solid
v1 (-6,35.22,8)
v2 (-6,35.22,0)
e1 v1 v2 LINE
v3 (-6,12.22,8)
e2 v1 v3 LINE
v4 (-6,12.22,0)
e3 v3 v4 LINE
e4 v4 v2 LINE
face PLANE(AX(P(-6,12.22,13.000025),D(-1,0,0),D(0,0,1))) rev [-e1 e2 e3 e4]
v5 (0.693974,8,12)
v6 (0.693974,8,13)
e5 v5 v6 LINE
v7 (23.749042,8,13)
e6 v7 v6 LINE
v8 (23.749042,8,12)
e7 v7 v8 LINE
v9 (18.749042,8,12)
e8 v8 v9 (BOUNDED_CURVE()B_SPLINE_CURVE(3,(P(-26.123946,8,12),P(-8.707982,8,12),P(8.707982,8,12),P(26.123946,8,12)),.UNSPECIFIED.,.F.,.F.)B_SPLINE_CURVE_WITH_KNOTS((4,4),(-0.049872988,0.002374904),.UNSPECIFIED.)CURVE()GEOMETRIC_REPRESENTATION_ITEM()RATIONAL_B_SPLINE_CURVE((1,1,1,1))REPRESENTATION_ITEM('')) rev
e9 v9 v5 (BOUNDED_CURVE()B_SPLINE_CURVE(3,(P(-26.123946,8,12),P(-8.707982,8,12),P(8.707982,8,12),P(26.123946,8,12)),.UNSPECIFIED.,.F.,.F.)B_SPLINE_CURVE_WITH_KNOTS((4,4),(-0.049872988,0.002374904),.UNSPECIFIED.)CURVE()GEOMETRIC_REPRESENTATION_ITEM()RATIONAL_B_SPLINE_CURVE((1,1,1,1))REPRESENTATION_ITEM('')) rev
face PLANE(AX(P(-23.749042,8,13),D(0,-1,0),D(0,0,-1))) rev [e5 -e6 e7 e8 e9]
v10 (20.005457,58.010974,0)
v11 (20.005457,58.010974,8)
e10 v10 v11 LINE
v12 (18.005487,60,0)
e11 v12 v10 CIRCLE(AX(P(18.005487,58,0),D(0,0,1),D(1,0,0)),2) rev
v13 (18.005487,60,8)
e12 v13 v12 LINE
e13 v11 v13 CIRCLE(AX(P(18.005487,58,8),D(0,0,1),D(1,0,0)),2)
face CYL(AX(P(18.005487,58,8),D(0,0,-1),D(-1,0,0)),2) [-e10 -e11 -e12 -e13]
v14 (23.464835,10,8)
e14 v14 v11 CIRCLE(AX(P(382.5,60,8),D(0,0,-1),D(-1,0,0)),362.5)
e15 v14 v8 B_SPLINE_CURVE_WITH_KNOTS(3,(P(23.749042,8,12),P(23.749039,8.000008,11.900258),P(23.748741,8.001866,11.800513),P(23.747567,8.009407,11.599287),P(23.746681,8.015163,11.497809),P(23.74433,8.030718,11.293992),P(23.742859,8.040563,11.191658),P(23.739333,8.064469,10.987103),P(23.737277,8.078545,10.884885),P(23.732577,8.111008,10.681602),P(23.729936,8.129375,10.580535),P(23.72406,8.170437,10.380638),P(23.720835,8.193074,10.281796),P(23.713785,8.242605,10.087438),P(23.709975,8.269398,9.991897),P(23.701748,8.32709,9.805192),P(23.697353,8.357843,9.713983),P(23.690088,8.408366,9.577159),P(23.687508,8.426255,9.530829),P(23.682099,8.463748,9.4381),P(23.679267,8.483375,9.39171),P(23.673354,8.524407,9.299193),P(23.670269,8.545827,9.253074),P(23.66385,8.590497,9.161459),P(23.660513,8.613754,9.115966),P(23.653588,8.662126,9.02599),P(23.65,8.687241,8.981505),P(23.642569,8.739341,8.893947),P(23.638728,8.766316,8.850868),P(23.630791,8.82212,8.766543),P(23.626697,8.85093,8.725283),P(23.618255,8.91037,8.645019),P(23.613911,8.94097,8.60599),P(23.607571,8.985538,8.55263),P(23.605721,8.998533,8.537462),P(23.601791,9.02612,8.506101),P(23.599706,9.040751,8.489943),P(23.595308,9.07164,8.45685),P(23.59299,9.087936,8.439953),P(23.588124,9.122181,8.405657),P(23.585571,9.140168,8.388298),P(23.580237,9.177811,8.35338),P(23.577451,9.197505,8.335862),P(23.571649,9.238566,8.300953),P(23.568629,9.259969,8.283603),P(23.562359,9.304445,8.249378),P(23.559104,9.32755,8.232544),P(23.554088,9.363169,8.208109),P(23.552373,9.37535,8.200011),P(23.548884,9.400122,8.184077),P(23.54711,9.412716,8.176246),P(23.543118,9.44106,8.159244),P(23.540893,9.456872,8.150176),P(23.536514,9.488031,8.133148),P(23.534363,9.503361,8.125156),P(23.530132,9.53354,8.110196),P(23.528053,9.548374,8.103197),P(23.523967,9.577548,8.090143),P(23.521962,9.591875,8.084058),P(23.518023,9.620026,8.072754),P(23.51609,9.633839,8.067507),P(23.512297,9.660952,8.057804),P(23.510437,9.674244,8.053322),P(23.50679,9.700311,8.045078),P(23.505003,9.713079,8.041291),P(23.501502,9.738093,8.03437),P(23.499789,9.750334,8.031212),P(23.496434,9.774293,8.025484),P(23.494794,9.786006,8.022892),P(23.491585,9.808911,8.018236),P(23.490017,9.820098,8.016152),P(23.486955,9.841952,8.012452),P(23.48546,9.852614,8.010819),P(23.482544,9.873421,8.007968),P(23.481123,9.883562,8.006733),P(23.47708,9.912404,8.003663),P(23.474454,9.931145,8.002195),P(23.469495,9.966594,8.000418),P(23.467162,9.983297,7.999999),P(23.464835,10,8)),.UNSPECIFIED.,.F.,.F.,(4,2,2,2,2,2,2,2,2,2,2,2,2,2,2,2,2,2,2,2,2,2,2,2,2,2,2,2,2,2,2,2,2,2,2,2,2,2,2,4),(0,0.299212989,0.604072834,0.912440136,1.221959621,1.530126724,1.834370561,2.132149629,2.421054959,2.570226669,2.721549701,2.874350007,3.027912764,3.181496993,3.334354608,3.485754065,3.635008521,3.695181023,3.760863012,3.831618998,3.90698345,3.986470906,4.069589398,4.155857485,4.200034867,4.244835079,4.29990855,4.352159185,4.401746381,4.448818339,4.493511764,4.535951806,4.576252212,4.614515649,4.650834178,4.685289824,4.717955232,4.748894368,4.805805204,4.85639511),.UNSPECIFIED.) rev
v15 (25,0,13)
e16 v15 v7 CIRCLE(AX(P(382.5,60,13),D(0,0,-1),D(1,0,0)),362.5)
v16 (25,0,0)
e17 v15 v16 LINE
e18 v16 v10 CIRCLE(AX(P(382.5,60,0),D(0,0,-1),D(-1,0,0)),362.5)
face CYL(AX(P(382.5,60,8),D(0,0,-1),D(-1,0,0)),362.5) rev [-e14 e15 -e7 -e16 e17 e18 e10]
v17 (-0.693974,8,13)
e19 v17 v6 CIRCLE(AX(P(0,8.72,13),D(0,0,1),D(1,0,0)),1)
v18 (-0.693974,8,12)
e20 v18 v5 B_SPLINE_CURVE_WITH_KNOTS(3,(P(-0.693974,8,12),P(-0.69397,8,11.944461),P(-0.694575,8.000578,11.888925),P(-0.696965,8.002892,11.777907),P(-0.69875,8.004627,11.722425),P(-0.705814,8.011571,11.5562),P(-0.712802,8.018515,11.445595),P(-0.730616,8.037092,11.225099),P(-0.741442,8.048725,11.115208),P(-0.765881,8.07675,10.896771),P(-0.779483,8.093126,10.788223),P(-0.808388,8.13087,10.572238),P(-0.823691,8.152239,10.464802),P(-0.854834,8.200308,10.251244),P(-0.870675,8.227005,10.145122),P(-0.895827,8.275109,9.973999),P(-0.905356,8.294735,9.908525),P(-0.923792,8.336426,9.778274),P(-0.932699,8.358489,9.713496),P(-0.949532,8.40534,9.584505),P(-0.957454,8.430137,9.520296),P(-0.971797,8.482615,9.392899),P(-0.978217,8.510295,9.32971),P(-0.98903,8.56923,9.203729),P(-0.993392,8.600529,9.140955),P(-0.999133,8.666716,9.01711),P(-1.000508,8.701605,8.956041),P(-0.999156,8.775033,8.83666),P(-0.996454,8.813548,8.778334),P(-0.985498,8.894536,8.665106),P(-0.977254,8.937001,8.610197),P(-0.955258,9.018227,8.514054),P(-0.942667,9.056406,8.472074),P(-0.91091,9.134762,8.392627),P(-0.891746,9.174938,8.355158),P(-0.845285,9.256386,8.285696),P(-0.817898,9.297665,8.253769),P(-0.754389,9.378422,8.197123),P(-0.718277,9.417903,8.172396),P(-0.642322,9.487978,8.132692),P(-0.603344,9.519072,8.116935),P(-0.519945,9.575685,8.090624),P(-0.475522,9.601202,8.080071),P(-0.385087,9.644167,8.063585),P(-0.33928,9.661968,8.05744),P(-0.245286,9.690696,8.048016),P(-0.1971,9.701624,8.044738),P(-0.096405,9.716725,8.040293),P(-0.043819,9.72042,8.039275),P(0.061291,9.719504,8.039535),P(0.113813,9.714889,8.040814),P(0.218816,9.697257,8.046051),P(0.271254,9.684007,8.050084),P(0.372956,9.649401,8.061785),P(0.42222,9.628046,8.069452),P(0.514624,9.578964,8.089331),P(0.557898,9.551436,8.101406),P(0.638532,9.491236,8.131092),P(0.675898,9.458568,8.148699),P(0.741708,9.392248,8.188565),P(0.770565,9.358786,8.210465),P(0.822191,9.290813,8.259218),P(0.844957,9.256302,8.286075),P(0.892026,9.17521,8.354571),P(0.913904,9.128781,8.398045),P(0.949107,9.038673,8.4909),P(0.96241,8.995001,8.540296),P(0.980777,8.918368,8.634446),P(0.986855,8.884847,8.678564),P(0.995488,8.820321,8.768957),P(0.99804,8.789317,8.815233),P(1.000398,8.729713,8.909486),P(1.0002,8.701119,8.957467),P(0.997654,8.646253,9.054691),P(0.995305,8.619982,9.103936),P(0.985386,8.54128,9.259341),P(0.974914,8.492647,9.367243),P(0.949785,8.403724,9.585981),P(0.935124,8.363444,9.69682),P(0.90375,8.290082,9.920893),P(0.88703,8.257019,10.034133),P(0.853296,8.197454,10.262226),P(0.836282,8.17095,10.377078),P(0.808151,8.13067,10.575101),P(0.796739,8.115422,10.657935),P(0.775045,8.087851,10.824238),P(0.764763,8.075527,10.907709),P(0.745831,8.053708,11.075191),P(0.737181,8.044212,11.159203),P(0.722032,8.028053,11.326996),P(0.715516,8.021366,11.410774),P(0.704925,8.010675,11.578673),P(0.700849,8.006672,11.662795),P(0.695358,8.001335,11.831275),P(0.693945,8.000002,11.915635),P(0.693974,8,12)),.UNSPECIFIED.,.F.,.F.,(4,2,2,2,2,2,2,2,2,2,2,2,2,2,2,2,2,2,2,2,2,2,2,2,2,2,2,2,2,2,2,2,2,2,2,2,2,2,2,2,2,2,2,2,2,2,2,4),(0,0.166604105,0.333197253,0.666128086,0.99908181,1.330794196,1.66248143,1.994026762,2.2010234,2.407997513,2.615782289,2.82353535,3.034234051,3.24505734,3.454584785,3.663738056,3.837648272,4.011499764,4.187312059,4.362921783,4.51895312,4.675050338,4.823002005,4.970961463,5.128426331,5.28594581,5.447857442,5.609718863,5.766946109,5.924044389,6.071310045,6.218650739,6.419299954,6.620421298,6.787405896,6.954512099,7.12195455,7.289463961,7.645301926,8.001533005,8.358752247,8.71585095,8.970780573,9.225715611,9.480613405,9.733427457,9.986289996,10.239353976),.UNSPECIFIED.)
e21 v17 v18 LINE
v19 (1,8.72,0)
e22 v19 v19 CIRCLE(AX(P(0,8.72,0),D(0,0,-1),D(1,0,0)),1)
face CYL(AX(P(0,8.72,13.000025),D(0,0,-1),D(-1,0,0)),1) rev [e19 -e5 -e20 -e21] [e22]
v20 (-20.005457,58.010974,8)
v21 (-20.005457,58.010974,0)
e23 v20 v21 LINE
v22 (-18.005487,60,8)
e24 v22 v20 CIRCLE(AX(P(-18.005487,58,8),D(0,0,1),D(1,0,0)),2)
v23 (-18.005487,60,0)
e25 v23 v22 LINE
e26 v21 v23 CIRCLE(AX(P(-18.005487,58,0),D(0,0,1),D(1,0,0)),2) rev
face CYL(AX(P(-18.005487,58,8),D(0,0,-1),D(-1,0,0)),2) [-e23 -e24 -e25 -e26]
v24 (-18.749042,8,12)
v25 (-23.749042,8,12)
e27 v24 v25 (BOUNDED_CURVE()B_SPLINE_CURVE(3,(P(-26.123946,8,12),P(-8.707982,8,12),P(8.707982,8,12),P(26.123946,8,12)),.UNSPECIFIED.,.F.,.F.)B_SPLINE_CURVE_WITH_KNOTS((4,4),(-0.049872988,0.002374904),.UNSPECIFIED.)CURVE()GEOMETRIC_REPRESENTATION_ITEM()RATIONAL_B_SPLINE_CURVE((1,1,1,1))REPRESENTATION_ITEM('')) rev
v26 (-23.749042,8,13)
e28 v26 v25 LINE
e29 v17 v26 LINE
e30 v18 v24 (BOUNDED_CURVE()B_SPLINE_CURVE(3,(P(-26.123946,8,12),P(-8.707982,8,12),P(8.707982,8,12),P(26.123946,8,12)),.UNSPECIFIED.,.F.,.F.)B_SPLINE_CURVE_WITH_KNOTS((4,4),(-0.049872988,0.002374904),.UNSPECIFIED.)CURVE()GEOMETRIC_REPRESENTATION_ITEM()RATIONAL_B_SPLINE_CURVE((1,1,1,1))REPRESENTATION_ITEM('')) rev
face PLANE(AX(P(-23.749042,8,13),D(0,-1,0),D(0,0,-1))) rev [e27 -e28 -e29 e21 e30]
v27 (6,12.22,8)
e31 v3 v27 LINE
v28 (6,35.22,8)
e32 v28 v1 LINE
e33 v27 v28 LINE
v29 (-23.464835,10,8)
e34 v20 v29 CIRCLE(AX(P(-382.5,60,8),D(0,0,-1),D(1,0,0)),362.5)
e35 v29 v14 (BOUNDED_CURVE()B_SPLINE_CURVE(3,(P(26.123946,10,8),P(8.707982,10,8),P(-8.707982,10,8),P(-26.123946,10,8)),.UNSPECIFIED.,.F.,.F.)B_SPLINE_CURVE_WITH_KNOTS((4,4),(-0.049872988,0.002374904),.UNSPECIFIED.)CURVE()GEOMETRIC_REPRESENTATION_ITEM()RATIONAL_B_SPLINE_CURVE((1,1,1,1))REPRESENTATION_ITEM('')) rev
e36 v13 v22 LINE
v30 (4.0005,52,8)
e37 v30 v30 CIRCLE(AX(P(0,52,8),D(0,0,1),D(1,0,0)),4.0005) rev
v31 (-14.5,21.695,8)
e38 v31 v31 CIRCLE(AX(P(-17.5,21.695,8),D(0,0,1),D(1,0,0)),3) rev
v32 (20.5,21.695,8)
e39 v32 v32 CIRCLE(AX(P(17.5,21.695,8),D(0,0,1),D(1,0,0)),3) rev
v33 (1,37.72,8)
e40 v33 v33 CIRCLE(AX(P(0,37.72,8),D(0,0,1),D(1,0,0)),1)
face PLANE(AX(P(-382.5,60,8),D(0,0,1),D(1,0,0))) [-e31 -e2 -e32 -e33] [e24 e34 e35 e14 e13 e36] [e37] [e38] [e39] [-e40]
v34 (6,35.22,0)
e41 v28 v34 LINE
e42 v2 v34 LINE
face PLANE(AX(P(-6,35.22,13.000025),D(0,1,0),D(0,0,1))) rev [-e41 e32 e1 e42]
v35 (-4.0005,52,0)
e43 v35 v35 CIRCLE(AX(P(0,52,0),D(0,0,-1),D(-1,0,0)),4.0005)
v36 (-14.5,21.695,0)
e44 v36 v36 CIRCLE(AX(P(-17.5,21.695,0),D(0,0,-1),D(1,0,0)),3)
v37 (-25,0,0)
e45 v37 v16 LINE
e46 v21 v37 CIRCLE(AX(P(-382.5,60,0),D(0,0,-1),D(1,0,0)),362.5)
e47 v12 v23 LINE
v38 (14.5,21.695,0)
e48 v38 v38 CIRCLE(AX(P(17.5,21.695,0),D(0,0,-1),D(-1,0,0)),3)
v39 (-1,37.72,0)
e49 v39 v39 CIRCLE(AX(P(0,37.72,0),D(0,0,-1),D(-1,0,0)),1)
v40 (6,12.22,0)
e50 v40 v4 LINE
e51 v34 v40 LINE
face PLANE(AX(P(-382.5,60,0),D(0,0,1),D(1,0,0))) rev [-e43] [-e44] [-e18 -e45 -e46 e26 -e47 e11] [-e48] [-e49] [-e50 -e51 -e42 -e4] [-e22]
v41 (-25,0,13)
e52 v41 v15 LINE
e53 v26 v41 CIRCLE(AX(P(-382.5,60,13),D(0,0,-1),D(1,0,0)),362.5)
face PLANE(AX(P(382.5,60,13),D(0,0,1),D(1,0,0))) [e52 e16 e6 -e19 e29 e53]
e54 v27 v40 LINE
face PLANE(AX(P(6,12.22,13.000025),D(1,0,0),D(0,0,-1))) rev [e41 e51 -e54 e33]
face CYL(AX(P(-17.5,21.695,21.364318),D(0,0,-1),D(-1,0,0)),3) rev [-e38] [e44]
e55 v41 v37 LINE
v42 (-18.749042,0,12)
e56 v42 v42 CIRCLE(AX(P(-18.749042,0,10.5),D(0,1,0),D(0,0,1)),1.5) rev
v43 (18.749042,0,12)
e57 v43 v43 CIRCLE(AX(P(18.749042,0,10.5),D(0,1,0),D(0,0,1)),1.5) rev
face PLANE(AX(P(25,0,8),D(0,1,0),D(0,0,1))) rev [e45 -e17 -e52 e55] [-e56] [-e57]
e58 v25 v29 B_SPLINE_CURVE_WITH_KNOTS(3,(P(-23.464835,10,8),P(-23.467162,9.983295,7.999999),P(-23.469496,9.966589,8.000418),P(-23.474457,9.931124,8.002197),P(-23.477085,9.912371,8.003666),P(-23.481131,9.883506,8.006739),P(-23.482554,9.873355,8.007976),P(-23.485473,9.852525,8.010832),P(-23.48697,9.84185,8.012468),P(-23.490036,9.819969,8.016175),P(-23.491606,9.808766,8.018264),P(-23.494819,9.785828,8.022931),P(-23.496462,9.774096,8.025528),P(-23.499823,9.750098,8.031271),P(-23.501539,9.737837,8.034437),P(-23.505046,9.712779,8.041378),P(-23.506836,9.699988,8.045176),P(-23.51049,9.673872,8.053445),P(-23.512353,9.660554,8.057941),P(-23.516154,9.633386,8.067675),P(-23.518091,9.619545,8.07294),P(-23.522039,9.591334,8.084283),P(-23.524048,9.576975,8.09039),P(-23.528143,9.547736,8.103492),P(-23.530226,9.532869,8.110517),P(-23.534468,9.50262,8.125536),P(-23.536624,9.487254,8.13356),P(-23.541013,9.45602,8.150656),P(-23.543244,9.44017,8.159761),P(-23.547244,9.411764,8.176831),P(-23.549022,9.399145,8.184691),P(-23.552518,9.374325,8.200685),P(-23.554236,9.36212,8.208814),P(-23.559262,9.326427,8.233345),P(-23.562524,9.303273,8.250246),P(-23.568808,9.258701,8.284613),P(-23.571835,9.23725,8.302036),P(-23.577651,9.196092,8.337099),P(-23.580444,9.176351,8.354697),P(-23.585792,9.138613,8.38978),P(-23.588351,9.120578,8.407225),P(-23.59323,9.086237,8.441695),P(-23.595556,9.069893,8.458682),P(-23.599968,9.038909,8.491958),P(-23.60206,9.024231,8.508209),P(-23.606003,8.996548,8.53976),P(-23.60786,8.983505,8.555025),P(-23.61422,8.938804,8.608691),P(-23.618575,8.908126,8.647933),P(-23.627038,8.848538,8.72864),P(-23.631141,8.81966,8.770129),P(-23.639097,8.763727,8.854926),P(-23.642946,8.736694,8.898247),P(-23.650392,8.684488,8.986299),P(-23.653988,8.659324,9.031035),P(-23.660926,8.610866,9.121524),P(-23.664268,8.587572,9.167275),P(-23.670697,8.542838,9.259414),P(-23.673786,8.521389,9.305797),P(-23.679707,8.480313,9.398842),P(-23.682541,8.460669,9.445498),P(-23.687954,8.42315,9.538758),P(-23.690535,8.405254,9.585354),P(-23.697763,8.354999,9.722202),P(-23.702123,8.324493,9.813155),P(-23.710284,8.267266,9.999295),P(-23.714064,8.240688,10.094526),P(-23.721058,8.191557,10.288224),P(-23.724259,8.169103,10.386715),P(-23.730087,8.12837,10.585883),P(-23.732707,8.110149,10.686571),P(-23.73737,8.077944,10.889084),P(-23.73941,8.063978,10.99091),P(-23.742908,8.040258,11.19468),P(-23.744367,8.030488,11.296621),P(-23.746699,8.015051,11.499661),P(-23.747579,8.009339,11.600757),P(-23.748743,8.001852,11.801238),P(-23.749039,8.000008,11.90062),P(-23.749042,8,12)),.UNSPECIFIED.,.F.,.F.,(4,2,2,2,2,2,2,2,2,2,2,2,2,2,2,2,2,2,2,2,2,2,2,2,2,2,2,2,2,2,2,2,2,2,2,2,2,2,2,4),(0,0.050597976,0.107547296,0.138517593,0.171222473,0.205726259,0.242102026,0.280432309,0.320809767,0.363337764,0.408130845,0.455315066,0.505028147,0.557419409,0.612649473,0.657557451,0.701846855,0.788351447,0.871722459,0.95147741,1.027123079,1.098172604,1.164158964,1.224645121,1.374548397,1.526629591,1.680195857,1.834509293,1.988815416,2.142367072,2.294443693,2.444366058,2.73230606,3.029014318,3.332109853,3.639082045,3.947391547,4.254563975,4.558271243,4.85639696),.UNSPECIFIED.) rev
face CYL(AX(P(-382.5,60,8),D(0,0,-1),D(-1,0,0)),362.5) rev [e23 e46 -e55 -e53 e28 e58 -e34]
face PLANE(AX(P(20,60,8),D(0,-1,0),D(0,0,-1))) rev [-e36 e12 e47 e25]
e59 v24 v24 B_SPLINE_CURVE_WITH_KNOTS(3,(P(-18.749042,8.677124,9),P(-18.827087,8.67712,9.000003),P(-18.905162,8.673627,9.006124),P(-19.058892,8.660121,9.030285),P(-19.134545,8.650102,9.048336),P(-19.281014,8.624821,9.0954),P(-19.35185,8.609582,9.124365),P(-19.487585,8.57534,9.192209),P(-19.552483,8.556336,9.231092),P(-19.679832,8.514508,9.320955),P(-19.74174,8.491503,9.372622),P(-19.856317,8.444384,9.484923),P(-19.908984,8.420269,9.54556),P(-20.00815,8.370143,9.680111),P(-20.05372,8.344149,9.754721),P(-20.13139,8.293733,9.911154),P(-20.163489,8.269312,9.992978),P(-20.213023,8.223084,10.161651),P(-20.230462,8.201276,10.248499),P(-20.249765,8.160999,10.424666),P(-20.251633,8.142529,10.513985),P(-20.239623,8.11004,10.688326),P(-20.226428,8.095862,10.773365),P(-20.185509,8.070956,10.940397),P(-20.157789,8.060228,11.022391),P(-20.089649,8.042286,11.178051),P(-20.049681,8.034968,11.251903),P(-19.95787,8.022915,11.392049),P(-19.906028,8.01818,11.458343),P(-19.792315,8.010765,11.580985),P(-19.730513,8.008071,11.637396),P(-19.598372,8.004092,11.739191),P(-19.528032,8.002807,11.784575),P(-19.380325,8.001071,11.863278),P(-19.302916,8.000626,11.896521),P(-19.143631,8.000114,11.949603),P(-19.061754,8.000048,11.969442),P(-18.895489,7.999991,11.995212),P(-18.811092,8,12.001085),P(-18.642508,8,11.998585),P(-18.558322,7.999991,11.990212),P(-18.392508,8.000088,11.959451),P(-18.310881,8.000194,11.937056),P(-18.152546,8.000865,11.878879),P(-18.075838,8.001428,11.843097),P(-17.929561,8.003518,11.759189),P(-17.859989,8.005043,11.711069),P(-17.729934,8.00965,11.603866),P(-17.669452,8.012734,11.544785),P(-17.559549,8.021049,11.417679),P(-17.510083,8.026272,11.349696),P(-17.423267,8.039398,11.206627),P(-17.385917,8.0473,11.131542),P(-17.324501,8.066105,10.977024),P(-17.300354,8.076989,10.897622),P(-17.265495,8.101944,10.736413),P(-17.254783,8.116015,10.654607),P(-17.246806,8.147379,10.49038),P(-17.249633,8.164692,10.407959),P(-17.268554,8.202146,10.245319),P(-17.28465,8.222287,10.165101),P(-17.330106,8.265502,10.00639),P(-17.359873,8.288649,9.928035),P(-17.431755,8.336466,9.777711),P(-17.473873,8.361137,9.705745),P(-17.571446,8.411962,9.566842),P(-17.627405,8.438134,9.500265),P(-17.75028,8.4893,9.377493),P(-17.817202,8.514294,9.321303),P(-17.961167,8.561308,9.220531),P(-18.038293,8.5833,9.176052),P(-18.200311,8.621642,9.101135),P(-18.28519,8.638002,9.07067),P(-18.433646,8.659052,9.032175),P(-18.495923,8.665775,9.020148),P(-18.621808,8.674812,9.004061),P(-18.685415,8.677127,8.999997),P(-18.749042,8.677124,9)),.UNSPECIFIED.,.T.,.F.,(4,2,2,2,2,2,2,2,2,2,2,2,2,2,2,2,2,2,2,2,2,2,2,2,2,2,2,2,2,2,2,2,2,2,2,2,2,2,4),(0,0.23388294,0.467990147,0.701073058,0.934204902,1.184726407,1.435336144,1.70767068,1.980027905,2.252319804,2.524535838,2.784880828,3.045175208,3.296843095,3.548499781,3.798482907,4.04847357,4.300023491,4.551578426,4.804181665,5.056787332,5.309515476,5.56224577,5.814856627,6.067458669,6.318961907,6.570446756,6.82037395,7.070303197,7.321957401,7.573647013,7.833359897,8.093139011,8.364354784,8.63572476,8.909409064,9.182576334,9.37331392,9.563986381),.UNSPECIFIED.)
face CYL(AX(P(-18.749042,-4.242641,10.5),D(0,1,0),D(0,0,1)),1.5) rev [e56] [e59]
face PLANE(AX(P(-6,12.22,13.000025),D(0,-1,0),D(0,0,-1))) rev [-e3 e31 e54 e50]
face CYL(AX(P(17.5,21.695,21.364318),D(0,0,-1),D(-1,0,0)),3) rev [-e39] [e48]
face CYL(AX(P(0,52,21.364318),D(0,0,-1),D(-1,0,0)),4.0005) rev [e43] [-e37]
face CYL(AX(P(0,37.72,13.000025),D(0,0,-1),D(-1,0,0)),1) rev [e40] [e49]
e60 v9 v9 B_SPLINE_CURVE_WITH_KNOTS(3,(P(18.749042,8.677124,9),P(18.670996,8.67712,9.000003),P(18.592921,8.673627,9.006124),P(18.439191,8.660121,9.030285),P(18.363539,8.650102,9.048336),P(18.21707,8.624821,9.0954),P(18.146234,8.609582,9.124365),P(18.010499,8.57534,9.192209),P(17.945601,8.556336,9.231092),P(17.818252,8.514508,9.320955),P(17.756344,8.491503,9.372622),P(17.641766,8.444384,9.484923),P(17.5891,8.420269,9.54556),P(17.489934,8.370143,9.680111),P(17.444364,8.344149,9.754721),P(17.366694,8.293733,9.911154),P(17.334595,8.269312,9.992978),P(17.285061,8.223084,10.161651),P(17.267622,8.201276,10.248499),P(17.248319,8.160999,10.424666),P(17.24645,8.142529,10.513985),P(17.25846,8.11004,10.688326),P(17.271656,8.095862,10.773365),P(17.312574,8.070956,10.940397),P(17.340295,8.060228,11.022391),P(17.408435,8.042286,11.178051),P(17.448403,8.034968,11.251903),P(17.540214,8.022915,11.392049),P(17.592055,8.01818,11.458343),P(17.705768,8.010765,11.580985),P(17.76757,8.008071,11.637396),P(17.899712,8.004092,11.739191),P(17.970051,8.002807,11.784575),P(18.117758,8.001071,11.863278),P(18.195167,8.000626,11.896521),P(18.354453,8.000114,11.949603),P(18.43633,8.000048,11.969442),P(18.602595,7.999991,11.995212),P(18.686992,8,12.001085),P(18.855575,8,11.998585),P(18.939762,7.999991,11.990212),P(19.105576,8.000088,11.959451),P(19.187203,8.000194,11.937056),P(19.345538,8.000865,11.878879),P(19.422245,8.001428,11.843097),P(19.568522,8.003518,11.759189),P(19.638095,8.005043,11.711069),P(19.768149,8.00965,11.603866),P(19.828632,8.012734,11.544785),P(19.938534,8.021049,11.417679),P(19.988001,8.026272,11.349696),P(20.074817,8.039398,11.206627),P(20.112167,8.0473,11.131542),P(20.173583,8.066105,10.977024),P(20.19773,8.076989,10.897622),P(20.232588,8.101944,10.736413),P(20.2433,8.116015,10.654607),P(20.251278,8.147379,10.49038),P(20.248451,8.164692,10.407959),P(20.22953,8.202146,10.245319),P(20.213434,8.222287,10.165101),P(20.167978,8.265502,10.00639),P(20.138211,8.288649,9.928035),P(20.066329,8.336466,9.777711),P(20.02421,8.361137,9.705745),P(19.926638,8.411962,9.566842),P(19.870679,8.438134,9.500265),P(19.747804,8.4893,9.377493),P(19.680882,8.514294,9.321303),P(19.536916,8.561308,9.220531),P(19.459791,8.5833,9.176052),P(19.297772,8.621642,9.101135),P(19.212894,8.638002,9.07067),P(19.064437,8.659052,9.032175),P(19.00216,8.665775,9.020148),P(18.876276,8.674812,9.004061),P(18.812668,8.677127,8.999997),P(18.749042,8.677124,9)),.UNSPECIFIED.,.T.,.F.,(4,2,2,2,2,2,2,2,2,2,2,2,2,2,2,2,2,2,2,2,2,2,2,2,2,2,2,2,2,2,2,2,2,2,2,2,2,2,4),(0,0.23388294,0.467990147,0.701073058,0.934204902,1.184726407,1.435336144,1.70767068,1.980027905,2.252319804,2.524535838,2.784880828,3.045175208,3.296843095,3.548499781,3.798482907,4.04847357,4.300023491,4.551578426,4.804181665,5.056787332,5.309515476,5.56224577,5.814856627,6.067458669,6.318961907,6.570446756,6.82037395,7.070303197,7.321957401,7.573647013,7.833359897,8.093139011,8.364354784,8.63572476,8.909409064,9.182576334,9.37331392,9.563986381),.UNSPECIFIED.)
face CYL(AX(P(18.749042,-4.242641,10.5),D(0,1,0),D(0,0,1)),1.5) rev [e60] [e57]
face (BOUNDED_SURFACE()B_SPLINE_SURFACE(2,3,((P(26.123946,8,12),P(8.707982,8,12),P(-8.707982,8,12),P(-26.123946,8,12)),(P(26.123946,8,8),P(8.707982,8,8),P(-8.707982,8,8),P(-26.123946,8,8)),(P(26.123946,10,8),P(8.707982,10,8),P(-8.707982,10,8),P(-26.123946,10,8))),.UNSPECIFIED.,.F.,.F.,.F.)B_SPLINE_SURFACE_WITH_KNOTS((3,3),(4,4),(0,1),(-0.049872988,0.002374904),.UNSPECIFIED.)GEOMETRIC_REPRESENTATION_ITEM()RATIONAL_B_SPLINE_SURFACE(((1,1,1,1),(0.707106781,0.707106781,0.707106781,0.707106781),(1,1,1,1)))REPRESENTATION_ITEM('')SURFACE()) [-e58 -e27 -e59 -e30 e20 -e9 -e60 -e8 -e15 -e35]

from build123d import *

# Parameters (mm, degrees)
BOSS_EXTRUDE1_DEPTH  = 8
BOSS_EXTRUDE2_DEPTH  = 5
SKETCH3_R            = 1.5
CUT_EXTRUDE_DEPTH    = 8
FILLET1_SIZE         = 4
FILLET1_SIZE_2       = 2
FILLET2_R            = 2
SKETCH4_R            = 4.0005
SKETCH4_R_2          = 4.725
SKETCH4_R_3          = 3
M4_H6_T_INSERT_DEPTH = 8
SKETCH12_R           = 1
SKETCH12_W           = 12
SKETCH12_H           = 23
CUT_EXTRUDE1_DEPTH   = 67.287253734


with BuildPart() as part:
    # Sketch1 → Boss-Extrude1 (new body)
    with BuildSketch(Plane.XY):
        with BuildLine():
            Line((20, 60), (-20, 60))
            ThreePointArc((-20, 60), (-21.252162636, 29.896013553), (-25, 0))
            Line((-25, 0), (25, 0))
            ThreePointArc((25, 0), (21.252162636, 29.896013553), (20, 60))
        make_face()
    extrude(amount=BOSS_EXTRUDE1_DEPTH)

    # Sketch2 → Boss-Extrude2 (add)
    with BuildSketch(Plane.XY.offset(8)):
        with BuildLine():
            Line((-25, 0), (25, 0))
            ThreePointArc((25, 0), (24.352183064, 3.996507037), (23.749041813, 8))
            Line((23.749041813, 8), (-23.749041813, 8))
            ThreePointArc((-23.749041813, 8), (-24.352183064, 3.996507037), (-25, 0))
        make_face()
    extrude(amount=BOSS_EXTRUDE2_DEPTH)

    # Sketch3 → Cut-Extrude (cut)
    with BuildSketch(Plane(origin=(0, 8, 0), x_dir=(1, 0, 0), z_dir=(0, 1, 0))):
        with Locations(Location((-18.749041813, -10.5, 0), (0, 0, 270))):
            Circle(SKETCH3_R)
        with Locations(Location((18.749041813, -10.5, 0), (0, 0, 270))):
            Circle(SKETCH3_R)
    extrude(amount=-CUT_EXTRUDE_DEPTH, mode=Mode.SUBTRACT)

    # Fillet1
    # an asymmetric fillet: 4, 2 mm, written as the material it adds along each edge
    with BuildSketch(Plane(origin=(33.749041813, 8, 8), x_dir=(0, 0, 1), z_dir=(-1, 0, 0))) as fillet1_piece_1_section:
        with BuildLine():
            Bezier((FILLET1_SIZE, 0), (0, 0), (0, FILLET1_SIZE_2), weights=[1, 0.707106781, 1])
            Line((0, FILLET1_SIZE_2), (-0.08, 2))
            Line((-0.08, 2), (-0.08, -0.08))
            Line((-0.08, -0.08), (4, -0.08))
            Line((4, -0.08), (FILLET1_SIZE, 0))
        make_face()
    fillet1_piece_1 = extrude(amount=67.498083626, mode=Mode.PRIVATE)
    fillet1_piece_1 = fillet1_piece_1 - Plane(origin=(382.5, 60, 8.944071766), x_dir=(-0.9862068965517241, -0.1655172413793104, 0), z_dir=(0, 0, -1)) * Cylinder(362.5, 151, mode=Mode.PRIVATE)
    fillet1_piece_1 = fillet1_piece_1 - Plane(origin=(-382.5, 60, 8.944071766), x_dir=(1, 0, 0), z_dir=(0, 0, -1)) * Cylinder(362.5, 151, mode=Mode.PRIVATE)
    fillet1_piece_1 = fillet1_piece_1 - Plane(origin=(-18.749041813, 8.425382089, 10.5), x_dir=(0, 0, 1), z_dir=(0, 1, 0)) * Cylinder(1.5, 151, mode=Mode.PRIVATE)
    fillet1_piece_1 = fillet1_piece_1 - Plane(origin=(18.749041813, 8.425382089, 10.5), x_dir=(0, 0, 1), z_dir=(0, 1, 0)) * Cylinder(1.5, 151, mode=Mode.PRIVATE)
    add(fillet1_piece_1)

    # Fillet2
    fillet2_edges = [part.edges().sort_by_distance(p)[0] for p in [
        (20, 60, 4),
        (-20, 60, 4),
    ]]
    fillet(fillet2_edges, radius=FILLET2_R)

    # Sketch4 → M4*H6 T-Insert (cut)
    with BuildSketch(Plane(origin=(0, 0, 0), x_dir=(-1, 0, 0), z_dir=(0, 0, -1))):
        with Locations((0, 52)):
            Circle(SKETCH4_R)
        with Locations((0, 29.37)):
            Circle(SKETCH4_R_2)
        with Locations((-17.5, 21.695)):
            Circle(SKETCH4_R_3)
        with Locations(Location((17.5, 21.695, 0), (0, 0, 180))):
            Circle(SKETCH4_R_3)
    extrude(amount=-M4_H6_T_INSERT_DEPTH, mode=Mode.SUBTRACT)

    # Sketch12 → Cut-Extrude1 (cut, through all)
    with BuildSketch(Plane(origin=(0, 0, 0), x_dir=(-1, 0, 0), z_dir=(0, 0, -1))):
        with Locations((0, 37.72)):
            Circle(SKETCH12_R)
        with Locations(Location((0, 8.72, 0), (0, 0, 313.945519562))):
            Circle(SKETCH12_R)
        with Locations((0, 23.72)):
            Rectangle(SKETCH12_W, SKETCH12_H)
    extrude(amount=-CUT_EXTRUDE1_DEPTH, mode=Mode.SUBTRACT)


solid = part.part
